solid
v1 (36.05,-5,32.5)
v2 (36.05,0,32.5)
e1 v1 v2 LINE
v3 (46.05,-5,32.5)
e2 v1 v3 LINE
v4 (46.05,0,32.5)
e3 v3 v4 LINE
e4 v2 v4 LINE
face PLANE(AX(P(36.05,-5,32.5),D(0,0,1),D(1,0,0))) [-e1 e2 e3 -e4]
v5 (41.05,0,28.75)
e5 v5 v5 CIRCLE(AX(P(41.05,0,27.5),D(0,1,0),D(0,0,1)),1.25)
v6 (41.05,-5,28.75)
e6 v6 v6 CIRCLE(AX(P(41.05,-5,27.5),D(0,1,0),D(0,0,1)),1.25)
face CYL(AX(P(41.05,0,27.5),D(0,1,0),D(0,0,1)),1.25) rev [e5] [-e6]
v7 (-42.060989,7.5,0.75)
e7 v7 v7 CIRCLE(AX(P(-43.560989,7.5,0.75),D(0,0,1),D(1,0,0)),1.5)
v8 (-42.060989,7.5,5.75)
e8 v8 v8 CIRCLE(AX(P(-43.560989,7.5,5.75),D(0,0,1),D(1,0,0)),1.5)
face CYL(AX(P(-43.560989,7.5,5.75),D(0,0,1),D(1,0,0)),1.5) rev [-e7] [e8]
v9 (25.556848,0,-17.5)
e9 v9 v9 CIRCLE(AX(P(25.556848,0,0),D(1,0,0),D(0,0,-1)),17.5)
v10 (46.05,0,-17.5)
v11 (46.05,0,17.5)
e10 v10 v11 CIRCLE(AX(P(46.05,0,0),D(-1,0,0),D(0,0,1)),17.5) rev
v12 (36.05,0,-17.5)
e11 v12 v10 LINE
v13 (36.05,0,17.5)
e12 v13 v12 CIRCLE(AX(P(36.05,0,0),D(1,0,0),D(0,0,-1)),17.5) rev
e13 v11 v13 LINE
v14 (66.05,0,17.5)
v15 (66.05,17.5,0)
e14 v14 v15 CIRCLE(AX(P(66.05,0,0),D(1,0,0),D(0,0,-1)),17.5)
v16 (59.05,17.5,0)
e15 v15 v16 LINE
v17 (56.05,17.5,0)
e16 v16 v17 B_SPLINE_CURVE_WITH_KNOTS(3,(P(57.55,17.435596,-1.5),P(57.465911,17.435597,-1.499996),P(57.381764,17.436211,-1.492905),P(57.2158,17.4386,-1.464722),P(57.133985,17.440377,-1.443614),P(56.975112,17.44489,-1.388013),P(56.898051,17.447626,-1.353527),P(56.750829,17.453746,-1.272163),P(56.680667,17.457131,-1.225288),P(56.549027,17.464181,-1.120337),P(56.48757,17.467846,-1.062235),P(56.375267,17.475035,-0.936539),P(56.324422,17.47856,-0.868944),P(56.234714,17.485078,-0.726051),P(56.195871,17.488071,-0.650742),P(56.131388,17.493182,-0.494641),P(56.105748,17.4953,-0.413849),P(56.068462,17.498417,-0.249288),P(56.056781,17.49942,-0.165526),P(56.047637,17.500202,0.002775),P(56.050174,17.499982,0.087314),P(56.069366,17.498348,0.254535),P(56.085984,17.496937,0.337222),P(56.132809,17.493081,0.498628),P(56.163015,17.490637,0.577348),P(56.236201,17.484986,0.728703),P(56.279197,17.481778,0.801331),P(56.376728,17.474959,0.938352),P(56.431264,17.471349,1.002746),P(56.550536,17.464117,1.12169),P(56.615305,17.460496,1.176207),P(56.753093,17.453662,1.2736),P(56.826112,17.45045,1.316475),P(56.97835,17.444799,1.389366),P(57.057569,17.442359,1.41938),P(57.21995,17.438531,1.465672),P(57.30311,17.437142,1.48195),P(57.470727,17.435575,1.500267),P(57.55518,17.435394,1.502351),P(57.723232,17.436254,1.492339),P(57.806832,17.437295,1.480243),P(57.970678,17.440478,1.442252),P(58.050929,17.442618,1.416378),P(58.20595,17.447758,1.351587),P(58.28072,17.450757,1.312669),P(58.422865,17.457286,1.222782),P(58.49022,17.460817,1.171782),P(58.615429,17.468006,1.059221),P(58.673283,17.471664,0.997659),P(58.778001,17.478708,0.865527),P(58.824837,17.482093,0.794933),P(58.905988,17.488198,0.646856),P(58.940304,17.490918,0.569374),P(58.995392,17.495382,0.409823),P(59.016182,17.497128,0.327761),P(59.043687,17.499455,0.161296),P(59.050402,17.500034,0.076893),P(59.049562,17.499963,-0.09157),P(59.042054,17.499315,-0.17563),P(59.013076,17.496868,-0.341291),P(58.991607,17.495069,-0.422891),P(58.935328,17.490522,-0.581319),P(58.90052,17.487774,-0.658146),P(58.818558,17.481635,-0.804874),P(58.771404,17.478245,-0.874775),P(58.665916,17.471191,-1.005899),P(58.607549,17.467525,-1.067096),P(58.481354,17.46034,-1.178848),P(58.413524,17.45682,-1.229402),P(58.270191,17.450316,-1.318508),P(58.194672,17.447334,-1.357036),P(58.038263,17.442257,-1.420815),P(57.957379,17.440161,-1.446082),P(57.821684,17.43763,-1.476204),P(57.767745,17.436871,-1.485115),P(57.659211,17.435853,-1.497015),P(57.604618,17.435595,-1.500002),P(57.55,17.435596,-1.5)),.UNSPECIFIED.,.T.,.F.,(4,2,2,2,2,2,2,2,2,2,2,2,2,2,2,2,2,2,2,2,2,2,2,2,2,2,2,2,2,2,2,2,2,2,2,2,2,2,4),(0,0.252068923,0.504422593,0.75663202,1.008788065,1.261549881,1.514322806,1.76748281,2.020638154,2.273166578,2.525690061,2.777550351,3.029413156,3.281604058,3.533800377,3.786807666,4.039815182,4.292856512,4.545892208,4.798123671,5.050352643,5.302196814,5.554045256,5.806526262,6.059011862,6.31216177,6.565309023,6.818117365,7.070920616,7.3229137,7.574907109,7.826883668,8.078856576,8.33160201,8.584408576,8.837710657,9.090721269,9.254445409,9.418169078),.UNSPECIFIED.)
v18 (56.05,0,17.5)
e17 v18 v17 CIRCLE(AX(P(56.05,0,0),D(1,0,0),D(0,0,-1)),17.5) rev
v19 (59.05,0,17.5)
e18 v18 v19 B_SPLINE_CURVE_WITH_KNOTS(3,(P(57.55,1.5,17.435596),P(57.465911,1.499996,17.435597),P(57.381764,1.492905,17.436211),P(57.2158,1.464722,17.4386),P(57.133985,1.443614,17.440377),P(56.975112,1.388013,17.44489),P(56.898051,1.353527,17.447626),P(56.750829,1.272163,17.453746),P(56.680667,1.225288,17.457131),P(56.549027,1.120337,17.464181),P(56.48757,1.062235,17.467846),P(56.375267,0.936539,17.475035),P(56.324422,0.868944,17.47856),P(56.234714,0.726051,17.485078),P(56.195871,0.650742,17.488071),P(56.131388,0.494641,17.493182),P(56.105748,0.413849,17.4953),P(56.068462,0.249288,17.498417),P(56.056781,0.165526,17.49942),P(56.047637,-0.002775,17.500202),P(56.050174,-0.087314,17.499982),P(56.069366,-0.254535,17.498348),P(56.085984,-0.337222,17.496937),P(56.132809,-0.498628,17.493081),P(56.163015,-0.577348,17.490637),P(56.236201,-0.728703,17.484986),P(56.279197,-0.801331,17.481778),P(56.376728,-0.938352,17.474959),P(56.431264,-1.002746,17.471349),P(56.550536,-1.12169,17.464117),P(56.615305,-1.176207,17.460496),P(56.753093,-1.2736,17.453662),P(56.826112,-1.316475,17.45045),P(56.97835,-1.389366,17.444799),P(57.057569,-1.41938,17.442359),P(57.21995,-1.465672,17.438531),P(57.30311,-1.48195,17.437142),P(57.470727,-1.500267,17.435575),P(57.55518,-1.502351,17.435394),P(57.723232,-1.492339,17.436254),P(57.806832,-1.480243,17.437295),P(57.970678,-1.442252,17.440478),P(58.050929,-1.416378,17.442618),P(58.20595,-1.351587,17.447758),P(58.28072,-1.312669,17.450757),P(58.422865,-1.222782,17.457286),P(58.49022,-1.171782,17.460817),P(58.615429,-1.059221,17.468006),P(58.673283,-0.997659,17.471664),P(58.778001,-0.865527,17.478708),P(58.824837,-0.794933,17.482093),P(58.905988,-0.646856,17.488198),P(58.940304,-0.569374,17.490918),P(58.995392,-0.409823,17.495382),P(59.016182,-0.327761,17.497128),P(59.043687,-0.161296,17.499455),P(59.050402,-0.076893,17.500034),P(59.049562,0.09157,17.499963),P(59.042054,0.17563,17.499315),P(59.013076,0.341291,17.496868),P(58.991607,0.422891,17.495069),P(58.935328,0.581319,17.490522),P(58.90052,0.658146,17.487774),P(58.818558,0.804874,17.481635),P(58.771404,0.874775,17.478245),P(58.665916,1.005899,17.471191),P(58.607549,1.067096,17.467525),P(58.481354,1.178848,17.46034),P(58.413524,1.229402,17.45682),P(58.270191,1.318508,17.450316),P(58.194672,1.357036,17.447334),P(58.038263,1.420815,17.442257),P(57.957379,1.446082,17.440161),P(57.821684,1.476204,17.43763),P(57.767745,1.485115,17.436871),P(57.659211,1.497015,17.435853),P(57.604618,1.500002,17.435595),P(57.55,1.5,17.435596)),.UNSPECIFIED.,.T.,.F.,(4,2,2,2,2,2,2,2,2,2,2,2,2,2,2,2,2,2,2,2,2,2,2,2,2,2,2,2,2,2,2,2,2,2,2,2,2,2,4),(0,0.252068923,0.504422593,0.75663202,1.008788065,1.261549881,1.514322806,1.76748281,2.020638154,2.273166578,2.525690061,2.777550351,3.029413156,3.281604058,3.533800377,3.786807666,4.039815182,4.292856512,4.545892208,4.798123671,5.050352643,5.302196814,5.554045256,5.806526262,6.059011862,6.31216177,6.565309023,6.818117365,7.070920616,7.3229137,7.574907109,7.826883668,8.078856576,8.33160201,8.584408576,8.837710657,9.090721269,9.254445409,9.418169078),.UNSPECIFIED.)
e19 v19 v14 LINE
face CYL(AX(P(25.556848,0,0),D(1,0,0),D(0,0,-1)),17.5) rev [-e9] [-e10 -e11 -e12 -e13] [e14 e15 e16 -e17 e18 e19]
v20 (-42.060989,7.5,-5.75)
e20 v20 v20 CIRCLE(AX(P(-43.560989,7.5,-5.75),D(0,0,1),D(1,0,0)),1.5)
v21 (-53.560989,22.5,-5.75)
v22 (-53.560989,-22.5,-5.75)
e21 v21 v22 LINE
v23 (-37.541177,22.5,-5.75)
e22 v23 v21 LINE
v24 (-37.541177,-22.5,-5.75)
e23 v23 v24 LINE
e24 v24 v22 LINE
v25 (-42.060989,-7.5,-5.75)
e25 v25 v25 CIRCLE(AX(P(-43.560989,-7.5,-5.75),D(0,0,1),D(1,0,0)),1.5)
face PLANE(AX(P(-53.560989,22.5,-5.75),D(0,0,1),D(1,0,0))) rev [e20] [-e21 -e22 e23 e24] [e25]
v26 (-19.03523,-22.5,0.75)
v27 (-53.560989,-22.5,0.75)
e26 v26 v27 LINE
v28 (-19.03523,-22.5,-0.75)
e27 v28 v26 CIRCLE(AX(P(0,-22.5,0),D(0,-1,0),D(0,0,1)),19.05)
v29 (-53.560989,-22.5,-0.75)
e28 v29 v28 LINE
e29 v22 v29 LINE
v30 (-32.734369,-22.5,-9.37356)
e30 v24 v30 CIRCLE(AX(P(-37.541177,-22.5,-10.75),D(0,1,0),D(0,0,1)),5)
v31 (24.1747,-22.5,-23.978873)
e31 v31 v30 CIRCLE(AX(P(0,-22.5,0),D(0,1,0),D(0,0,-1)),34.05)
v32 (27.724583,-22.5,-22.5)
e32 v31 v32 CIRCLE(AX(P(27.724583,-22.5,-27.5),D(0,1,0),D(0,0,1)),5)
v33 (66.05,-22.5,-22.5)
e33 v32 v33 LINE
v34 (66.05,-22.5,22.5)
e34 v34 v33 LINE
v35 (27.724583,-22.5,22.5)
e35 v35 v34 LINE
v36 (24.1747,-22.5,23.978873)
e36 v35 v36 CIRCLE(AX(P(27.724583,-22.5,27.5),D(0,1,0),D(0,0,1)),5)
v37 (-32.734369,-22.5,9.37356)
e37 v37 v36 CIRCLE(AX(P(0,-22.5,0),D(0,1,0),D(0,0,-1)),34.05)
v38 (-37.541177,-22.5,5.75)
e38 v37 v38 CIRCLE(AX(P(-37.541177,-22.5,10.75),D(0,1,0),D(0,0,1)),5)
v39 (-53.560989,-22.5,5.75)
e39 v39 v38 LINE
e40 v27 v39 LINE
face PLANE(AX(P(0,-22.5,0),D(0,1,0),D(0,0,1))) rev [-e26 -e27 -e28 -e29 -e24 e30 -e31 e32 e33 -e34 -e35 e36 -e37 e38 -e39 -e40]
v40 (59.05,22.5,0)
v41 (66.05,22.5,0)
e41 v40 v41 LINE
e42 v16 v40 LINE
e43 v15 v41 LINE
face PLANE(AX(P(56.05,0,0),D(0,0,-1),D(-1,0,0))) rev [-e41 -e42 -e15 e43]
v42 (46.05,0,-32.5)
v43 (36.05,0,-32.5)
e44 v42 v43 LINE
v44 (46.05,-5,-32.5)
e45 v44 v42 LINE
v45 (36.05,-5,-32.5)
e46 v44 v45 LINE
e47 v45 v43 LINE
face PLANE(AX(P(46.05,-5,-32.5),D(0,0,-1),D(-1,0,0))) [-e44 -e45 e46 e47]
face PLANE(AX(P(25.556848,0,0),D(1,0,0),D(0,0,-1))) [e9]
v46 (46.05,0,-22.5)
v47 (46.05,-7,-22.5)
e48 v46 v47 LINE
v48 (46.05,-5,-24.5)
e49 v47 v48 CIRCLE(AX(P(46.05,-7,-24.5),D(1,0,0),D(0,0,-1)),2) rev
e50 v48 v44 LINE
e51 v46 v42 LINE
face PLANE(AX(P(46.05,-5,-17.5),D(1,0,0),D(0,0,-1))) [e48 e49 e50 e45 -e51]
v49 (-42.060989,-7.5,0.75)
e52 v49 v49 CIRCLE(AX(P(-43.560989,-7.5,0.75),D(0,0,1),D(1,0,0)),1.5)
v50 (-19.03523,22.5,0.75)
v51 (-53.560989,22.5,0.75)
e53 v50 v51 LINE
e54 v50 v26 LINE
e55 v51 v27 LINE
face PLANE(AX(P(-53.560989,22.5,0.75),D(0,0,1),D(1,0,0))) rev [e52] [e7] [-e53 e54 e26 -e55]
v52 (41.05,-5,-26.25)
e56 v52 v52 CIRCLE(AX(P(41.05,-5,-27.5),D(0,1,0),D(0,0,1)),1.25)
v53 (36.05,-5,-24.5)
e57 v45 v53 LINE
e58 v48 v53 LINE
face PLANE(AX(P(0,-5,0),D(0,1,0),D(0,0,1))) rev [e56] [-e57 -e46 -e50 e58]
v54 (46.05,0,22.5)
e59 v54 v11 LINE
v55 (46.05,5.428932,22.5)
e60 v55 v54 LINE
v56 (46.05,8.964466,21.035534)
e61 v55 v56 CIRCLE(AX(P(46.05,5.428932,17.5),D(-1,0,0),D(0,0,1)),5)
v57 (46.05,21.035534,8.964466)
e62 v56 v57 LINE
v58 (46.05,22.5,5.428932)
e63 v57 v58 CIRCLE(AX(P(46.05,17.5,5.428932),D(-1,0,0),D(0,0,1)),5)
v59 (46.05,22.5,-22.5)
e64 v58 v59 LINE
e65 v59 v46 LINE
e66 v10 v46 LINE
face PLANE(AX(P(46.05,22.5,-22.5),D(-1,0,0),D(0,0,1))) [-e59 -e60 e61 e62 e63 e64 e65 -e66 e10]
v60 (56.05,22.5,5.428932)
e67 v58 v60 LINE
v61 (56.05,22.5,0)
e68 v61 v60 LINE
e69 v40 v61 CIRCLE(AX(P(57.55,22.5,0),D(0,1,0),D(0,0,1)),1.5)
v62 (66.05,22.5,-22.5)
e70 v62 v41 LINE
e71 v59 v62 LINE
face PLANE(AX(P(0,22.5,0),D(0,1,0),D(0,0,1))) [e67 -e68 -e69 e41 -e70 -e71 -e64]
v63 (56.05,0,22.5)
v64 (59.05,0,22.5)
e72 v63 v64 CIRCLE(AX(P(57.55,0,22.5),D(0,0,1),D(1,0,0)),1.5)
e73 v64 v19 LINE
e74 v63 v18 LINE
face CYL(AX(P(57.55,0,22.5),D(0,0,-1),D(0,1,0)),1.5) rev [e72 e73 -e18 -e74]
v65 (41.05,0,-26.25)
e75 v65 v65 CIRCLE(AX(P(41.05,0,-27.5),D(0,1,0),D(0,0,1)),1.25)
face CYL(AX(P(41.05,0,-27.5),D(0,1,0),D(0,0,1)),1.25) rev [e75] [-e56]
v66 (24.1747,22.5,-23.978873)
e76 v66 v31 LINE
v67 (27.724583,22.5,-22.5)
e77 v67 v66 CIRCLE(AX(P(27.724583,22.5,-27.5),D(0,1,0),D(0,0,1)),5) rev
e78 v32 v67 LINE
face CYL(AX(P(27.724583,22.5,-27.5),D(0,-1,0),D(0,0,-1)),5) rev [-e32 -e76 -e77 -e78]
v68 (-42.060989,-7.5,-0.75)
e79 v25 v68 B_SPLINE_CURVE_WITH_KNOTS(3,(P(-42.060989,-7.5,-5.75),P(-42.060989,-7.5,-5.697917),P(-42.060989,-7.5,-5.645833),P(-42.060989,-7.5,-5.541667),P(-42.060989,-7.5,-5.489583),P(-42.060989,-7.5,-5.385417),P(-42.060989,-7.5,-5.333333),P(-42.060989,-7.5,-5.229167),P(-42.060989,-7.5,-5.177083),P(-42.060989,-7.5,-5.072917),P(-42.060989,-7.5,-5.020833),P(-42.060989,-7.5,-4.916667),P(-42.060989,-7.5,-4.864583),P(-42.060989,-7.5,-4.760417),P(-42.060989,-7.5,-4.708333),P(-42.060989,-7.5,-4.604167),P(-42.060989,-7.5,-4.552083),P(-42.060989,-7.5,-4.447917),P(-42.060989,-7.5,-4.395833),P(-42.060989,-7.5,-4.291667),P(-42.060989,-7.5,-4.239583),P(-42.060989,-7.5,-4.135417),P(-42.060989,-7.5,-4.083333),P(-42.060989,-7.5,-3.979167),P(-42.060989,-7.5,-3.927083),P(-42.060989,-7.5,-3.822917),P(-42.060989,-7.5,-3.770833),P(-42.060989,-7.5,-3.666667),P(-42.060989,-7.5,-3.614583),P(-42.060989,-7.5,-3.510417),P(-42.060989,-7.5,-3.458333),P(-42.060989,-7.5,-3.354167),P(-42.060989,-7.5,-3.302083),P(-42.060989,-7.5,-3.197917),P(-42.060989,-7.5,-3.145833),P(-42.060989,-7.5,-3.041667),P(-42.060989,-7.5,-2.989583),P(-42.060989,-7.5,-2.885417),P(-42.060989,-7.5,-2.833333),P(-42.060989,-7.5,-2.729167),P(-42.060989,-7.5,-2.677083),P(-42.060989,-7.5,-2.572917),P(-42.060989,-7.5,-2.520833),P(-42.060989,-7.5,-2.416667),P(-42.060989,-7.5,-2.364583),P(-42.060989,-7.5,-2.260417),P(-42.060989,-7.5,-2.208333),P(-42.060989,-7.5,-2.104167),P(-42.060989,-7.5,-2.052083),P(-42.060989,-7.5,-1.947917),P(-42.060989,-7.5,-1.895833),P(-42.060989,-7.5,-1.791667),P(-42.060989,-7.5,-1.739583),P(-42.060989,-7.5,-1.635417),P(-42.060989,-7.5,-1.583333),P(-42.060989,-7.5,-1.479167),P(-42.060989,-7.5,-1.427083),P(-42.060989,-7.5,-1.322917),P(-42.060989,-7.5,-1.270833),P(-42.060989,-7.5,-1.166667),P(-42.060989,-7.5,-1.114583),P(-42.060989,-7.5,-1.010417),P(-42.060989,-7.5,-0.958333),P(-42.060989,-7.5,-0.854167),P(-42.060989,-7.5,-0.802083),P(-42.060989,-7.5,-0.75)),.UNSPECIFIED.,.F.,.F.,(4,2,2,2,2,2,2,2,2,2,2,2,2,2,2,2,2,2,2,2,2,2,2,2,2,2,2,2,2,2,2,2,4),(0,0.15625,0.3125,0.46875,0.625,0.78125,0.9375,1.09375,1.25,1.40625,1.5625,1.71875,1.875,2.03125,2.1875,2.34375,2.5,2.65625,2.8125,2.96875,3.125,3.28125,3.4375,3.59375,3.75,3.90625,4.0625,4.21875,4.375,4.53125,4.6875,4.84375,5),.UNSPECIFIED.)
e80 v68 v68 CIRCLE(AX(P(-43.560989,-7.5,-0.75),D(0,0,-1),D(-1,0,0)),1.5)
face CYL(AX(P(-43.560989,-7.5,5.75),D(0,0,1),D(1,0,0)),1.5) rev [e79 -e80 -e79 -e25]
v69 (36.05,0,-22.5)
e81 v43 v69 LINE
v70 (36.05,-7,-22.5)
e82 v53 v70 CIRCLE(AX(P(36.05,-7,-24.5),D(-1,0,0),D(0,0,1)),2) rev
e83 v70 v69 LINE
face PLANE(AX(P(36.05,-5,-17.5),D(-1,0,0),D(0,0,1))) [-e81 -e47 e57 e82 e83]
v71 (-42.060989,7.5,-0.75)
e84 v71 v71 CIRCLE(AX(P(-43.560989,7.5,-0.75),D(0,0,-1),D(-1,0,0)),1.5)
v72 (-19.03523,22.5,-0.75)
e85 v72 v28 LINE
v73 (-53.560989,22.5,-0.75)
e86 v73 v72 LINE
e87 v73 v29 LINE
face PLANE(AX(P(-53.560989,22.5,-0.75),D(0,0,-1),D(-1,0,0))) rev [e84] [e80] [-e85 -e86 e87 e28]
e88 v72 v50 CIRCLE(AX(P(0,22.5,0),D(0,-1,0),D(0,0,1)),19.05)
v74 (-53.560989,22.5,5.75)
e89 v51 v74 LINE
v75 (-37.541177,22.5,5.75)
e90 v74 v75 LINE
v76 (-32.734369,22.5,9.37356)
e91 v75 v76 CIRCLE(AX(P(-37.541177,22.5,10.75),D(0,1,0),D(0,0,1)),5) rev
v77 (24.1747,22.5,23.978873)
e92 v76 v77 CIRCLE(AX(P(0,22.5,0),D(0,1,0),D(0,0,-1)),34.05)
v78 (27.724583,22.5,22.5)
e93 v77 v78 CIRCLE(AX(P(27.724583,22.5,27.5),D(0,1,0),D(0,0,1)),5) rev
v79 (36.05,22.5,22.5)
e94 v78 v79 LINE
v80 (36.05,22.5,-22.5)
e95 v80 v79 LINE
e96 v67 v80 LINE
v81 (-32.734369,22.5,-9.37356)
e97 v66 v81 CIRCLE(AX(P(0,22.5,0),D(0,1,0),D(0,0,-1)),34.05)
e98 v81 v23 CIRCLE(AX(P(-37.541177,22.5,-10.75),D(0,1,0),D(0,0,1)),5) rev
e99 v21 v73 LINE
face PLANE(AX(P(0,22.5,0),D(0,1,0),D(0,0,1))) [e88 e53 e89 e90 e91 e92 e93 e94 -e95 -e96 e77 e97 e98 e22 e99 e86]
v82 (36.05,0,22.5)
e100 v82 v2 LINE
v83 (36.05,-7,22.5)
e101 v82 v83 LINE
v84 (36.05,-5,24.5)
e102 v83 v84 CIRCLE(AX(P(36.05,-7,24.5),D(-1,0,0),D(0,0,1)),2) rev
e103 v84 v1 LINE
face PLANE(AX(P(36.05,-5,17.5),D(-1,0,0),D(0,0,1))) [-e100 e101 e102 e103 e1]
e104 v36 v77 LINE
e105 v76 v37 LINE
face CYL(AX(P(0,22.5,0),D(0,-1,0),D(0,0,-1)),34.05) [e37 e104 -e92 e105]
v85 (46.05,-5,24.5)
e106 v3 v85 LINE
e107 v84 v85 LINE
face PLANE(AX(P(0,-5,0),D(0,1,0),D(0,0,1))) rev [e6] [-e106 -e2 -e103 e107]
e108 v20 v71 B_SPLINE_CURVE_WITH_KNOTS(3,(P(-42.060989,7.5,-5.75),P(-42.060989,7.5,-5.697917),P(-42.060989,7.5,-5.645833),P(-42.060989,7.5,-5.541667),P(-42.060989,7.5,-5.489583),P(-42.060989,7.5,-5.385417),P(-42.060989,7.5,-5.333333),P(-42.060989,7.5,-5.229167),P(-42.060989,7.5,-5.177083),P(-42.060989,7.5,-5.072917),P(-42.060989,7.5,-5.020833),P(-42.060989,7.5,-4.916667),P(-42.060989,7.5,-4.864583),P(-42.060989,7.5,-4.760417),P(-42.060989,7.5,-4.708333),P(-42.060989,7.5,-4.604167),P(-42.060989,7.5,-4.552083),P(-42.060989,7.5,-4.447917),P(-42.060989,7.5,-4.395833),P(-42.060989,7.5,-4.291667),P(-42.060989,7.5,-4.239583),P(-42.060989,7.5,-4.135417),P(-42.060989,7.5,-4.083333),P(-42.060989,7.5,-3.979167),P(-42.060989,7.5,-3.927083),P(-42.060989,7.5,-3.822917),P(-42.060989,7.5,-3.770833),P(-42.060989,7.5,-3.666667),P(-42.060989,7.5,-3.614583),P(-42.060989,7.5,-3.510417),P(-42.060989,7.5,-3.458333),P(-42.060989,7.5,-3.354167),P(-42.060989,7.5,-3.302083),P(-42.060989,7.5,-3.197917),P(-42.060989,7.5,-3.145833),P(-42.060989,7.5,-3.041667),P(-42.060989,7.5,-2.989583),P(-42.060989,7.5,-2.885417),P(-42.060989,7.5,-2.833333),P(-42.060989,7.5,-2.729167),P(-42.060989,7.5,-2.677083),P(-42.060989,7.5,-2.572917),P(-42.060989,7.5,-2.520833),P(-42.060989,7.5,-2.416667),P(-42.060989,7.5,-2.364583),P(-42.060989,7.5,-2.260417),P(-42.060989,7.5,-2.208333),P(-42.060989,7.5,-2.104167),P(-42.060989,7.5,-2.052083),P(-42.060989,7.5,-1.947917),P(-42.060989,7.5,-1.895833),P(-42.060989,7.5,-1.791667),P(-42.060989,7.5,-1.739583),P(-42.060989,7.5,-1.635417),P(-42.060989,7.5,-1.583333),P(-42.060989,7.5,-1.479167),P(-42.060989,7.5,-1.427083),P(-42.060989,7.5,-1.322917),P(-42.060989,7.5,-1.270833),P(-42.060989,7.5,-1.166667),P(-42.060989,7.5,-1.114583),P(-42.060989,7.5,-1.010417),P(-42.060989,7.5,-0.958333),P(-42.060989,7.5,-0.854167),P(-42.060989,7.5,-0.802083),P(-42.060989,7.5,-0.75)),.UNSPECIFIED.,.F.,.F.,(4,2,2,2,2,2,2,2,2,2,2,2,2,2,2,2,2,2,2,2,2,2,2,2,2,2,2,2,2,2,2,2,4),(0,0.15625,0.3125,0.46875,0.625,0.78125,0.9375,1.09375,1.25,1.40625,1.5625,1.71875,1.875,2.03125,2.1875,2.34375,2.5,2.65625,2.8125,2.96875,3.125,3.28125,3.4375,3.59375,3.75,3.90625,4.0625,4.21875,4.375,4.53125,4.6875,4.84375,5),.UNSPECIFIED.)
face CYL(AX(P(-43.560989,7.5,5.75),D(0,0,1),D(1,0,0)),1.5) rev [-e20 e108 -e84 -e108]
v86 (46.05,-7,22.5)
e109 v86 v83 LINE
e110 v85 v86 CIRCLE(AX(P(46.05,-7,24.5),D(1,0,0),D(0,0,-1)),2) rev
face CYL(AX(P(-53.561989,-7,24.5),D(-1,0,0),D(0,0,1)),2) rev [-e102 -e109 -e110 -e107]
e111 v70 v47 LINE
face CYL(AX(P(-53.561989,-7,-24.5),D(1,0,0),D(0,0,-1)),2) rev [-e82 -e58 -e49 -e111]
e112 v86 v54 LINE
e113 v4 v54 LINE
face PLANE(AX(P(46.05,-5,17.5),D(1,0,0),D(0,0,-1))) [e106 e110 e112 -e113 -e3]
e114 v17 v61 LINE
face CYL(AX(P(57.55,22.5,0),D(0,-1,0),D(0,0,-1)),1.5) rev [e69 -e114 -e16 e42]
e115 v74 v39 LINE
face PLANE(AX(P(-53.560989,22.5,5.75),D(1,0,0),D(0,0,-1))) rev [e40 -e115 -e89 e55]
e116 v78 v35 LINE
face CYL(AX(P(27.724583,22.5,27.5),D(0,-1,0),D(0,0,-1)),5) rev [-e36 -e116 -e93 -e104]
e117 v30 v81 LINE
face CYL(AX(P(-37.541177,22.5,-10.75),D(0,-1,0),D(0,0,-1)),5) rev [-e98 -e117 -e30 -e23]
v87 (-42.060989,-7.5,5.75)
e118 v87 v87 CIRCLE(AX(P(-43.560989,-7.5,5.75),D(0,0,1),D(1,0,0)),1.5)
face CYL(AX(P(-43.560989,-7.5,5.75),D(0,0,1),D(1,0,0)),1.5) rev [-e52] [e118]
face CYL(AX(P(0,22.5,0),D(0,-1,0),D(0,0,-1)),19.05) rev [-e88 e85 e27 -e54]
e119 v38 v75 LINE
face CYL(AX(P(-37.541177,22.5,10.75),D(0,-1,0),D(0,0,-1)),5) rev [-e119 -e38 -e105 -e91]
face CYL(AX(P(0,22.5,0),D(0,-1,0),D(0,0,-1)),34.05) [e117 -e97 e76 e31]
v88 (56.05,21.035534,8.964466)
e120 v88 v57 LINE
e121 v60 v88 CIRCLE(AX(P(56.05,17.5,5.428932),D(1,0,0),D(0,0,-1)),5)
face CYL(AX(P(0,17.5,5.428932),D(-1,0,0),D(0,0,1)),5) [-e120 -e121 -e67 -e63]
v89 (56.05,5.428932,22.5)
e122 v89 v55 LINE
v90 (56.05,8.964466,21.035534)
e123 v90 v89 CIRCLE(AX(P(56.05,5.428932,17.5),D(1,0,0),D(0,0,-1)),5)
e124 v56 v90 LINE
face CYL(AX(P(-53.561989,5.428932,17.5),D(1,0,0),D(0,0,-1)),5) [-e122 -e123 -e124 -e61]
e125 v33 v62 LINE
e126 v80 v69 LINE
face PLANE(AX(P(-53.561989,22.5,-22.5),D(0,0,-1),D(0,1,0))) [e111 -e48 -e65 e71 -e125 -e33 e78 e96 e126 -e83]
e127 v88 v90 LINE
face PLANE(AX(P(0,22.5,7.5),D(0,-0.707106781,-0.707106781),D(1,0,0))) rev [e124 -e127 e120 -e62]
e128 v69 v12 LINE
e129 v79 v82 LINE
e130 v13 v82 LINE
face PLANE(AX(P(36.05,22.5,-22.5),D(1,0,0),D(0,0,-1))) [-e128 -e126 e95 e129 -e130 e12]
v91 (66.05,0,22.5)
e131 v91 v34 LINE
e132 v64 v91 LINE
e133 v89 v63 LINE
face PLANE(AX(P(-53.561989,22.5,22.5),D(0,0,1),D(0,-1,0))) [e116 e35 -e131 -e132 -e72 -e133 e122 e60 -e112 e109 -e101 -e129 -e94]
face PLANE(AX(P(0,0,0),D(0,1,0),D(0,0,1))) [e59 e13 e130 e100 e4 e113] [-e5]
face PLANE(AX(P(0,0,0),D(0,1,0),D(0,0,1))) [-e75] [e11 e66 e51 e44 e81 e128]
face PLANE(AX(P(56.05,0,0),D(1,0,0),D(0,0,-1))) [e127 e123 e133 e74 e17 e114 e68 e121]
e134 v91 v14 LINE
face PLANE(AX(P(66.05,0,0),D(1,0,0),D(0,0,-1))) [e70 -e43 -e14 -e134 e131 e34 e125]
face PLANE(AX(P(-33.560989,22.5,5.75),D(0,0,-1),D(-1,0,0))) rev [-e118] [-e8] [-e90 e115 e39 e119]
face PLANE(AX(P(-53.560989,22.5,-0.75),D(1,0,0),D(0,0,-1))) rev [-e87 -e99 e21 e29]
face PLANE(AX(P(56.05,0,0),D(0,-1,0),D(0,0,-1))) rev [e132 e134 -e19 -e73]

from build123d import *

# Parameters (mm, degrees)
BOSS_EXTRUDE1_DEPTH       = 22.5
F_3_0MM_DOWEL_HOLE1_D     = 3
BOSS_EXTRUDE2_START       = -8.493151603
BOSS_EXTRUDE2_OUTLINE_W   = 45
BOSS_EXTRUDE2_OUTLINE_H   = 45
BOSS_EXTRUDE2_DEPTH       = 40.493151603
SKETCH5_R                 = 17.5
CUT_EXTRUDE1_DEPTH        = 40.493152
SKETCH7_W                 = 10
SKETCH7_H                 = 45
CUT_EXTRUDE2_DEPTH        = 78.641837948
SKETCH8_W                 = 22.5
SKETCH8_H                 = 22.5
CUT_EXTRUDE3_DEPTH        = 10
CUT_EXTRUDE5_OUTLINE_W    = 1.5
CUT_EXTRUDE5_OUTLINE_H    = 5.064430618
CUT_EXTRUDE8_START        = 17.435595673
CUT_EXTRUDE8_DEPTH        = 5.064404327
SKETCH14_W                = 10
SKETCH14_H                = 15
BOSS_EXTRUDE3_DEPTH       = 5
M3X0_5_TAPPED_HOLE1_D     = 2.5
M3X0_5_TAPPED_HOLE1_DEPTH = 7.748924226
M3X0_5_TAPPED_HOLE1_TIP   = 0.751075774
CHAMFER1_SIZE             = 15
FILLET1_R                 = 2
FILLET2_R                 = 5
FILLET3_R                 = 5


# Read off the part's stored shape, not the designer's step: Boss-Extrude2, Cut-Extrude5, Cut-Extrude8
with BuildPart() as part:
    # Sketch3 → Boss-Extrude1 (new, symmetric)
    with BuildSketch(Plane(origin=(0, 0, 0), x_dir=(1, 0, 0), z_dir=(0, 1, 0))):
        with BuildLine():
            Line((-53.560989258, 0.75), (-53.560989258, 5.75))
            Line((-53.560989258, 5.75), (-33.560989258, 5.75))
            ThreePointArc((-33.560989258, 5.75), (34.05, 0), (-33.560989258, -5.75))
            Line((-33.560989258, -5.75), (-53.560989258, -5.75))
            Line((-53.560989258, -5.75), (-53.560989258, -0.75))
            Line((-53.560989258, -0.75), (-19.035230495, -0.75))
            ThreePointArc((-19.035230495, -0.75), (19.05, 0), (-19.035230495, 0.75))
            Line((-19.035230495, 0.75), (-53.560989258, 0.75))
        make_face()
    extrude(amount=BOSS_EXTRUDE1_DEPTH, both=True)

    # Ø3.0mm Dowel Hole1 (through all)
    with Locations(Plane.XY.offset(5.75)):
        with Locations((-43.560989258, 7.5), (-43.560989258, -7.5)):
            Hole(F_3_0MM_DOWEL_HOLE1_D / 2)

    # Boss-Extrude2 outline → Boss-Extrude2 (add)
    with BuildSketch(Plane(origin=(34.05, 0, 0), x_dir=(0, 0, -1), z_dir=(1, 0, 0)).offset(BOSS_EXTRUDE2_START)):
        Rectangle(BOSS_EXTRUDE2_OUTLINE_W, BOSS_EXTRUDE2_OUTLINE_H)
    extrude(amount=BOSS_EXTRUDE2_DEPTH)

    # Sketch5 → Cut-Extrude1 (cut)
    with BuildSketch(Plane(origin=(66.05, 0, 0), x_dir=(0, 0, -1), z_dir=(1, 0, 0))):
        Circle(SKETCH5_R)
    extrude(amount=-CUT_EXTRUDE1_DEPTH, mode=Mode.SUBTRACT)

    # Sketch7 → Cut-Extrude2 (cut, through all)
    with BuildSketch(Plane(origin=(0, 0, 0), x_dir=(1, 0, 0), z_dir=(0, 1, 0))):
        with Locations((41.05, 0)):
            Rectangle(SKETCH7_W, SKETCH7_H)
    extrude(amount=CUT_EXTRUDE2_DEPTH, mode=Mode.SUBTRACT)

    # Sketch8 → Cut-Extrude3 (cut)
    with BuildSketch(Plane(origin=(66.05, 0, 0), x_dir=(0, 0, -1), z_dir=(1, 0, 0))):
        with Locations((-11.25, 11.25)):
            Rectangle(SKETCH8_W, SKETCH8_H)
    extrude(amount=-CUT_EXTRUDE3_DEPTH, mode=Mode.SUBTRACT)

    # Cut-Extrude5 outline → Cut-Extrude5 (revolve, cut)
    with BuildSketch(Plane(origin=(57.55, 0, 0), x_dir=(1, 0, 0), z_dir=(0, -1, 0))):
        with Locations((0.75, 19.967784691)):
            Rectangle(CUT_EXTRUDE5_OUTLINE_W, CUT_EXTRUDE5_OUTLINE_H)
    revolve(axis=Axis((57.55, 0, 0), (0, 0, 1)), mode=Mode.SUBTRACT)

    # Cut-Extrude8 outline → Cut-Extrude8 (cut)
    with BuildSketch(Plane(origin=(0, 0, 0), x_dir=(1, 0, 0), z_dir=(0, 1, 0)).offset(CUT_EXTRUDE8_START)):
        with BuildLine():
            ThreePointArc((59.05, 0), (57.55, 1.5), (56.05, 0))
            Line((56.05, 0), (59.05, 0))
        make_face()
    extrude(amount=CUT_EXTRUDE8_DEPTH, mode=Mode.SUBTRACT)

    # Sketch14 → Boss-Extrude3 (add)
    with BuildSketch(Plane(origin=(0, 0, 0), x_dir=(1, 0, 0), z_dir=(0, 1, 0))):
        with Locations((41.05, -25)):
            Rectangle(SKETCH14_W, SKETCH14_H)
        with Locations((41.05, 25)):
            Rectangle(SKETCH14_W, SKETCH14_H)
    extrude(amount=-BOSS_EXTRUDE3_DEPTH)

    # M3x0.5 Tapped Hole1
    with Locations(Plane(origin=(0, 0, 0), x_dir=(1, 0, 0), z_dir=(0, 1, 0))):
        with Locations((41.05, 27.5), (41.05, -27.5)):
            Hole(M3X0_5_TAPPED_HOLE1_D / 2, depth=M3X0_5_TAPPED_HOLE1_DEPTH)
            with Locations((0, 0, -(M3X0_5_TAPPED_HOLE1_DEPTH + M3X0_5_TAPPED_HOLE1_TIP / 2))):  # 118° drill point
                Cone(0, M3X0_5_TAPPED_HOLE1_D / 2, M3X0_5_TAPPED_HOLE1_TIP, mode=Mode.SUBTRACT)

    # Chamfer1
    chamfer1_edges = [part.edges().sort_by_distance(p)[0] for p in [
        (51.05, 22.5, 22.5),
    ]]
    chamfer(chamfer1_edges, length=CHAMFER1_SIZE)

    # Fillet1
    fillet1_edges = [part.edges().sort_by_distance(p)[0] for p in [
        (41.05, -5, 22.5),
        (41.05, -5, -22.5),
    ]]
    fillet(fillet1_edges, radius=FILLET1_R)

    # Fillet2
    fillet2_edges = [part.edges().sort_by_distance(p)[0] for p in [
        (51.05, 22.5, 7.5),
        (51.05, 7.5, 22.5),
    ]]
    fillet(fillet2_edges, radius=FILLET2_R)

    # Fillet3
    fillet3_edges = [part.edges().sort_by_distance(p)[0] for p in [
        (-33.560989258, 0, -5.75),
        (-33.560989258, 0, 5.75),
        (25.556848397, 0, -22.5),
        (25.556848397, 0, 22.5),
    ]]
    fillet(fillet3_edges, radius=FILLET3_R)


solid = part.part
